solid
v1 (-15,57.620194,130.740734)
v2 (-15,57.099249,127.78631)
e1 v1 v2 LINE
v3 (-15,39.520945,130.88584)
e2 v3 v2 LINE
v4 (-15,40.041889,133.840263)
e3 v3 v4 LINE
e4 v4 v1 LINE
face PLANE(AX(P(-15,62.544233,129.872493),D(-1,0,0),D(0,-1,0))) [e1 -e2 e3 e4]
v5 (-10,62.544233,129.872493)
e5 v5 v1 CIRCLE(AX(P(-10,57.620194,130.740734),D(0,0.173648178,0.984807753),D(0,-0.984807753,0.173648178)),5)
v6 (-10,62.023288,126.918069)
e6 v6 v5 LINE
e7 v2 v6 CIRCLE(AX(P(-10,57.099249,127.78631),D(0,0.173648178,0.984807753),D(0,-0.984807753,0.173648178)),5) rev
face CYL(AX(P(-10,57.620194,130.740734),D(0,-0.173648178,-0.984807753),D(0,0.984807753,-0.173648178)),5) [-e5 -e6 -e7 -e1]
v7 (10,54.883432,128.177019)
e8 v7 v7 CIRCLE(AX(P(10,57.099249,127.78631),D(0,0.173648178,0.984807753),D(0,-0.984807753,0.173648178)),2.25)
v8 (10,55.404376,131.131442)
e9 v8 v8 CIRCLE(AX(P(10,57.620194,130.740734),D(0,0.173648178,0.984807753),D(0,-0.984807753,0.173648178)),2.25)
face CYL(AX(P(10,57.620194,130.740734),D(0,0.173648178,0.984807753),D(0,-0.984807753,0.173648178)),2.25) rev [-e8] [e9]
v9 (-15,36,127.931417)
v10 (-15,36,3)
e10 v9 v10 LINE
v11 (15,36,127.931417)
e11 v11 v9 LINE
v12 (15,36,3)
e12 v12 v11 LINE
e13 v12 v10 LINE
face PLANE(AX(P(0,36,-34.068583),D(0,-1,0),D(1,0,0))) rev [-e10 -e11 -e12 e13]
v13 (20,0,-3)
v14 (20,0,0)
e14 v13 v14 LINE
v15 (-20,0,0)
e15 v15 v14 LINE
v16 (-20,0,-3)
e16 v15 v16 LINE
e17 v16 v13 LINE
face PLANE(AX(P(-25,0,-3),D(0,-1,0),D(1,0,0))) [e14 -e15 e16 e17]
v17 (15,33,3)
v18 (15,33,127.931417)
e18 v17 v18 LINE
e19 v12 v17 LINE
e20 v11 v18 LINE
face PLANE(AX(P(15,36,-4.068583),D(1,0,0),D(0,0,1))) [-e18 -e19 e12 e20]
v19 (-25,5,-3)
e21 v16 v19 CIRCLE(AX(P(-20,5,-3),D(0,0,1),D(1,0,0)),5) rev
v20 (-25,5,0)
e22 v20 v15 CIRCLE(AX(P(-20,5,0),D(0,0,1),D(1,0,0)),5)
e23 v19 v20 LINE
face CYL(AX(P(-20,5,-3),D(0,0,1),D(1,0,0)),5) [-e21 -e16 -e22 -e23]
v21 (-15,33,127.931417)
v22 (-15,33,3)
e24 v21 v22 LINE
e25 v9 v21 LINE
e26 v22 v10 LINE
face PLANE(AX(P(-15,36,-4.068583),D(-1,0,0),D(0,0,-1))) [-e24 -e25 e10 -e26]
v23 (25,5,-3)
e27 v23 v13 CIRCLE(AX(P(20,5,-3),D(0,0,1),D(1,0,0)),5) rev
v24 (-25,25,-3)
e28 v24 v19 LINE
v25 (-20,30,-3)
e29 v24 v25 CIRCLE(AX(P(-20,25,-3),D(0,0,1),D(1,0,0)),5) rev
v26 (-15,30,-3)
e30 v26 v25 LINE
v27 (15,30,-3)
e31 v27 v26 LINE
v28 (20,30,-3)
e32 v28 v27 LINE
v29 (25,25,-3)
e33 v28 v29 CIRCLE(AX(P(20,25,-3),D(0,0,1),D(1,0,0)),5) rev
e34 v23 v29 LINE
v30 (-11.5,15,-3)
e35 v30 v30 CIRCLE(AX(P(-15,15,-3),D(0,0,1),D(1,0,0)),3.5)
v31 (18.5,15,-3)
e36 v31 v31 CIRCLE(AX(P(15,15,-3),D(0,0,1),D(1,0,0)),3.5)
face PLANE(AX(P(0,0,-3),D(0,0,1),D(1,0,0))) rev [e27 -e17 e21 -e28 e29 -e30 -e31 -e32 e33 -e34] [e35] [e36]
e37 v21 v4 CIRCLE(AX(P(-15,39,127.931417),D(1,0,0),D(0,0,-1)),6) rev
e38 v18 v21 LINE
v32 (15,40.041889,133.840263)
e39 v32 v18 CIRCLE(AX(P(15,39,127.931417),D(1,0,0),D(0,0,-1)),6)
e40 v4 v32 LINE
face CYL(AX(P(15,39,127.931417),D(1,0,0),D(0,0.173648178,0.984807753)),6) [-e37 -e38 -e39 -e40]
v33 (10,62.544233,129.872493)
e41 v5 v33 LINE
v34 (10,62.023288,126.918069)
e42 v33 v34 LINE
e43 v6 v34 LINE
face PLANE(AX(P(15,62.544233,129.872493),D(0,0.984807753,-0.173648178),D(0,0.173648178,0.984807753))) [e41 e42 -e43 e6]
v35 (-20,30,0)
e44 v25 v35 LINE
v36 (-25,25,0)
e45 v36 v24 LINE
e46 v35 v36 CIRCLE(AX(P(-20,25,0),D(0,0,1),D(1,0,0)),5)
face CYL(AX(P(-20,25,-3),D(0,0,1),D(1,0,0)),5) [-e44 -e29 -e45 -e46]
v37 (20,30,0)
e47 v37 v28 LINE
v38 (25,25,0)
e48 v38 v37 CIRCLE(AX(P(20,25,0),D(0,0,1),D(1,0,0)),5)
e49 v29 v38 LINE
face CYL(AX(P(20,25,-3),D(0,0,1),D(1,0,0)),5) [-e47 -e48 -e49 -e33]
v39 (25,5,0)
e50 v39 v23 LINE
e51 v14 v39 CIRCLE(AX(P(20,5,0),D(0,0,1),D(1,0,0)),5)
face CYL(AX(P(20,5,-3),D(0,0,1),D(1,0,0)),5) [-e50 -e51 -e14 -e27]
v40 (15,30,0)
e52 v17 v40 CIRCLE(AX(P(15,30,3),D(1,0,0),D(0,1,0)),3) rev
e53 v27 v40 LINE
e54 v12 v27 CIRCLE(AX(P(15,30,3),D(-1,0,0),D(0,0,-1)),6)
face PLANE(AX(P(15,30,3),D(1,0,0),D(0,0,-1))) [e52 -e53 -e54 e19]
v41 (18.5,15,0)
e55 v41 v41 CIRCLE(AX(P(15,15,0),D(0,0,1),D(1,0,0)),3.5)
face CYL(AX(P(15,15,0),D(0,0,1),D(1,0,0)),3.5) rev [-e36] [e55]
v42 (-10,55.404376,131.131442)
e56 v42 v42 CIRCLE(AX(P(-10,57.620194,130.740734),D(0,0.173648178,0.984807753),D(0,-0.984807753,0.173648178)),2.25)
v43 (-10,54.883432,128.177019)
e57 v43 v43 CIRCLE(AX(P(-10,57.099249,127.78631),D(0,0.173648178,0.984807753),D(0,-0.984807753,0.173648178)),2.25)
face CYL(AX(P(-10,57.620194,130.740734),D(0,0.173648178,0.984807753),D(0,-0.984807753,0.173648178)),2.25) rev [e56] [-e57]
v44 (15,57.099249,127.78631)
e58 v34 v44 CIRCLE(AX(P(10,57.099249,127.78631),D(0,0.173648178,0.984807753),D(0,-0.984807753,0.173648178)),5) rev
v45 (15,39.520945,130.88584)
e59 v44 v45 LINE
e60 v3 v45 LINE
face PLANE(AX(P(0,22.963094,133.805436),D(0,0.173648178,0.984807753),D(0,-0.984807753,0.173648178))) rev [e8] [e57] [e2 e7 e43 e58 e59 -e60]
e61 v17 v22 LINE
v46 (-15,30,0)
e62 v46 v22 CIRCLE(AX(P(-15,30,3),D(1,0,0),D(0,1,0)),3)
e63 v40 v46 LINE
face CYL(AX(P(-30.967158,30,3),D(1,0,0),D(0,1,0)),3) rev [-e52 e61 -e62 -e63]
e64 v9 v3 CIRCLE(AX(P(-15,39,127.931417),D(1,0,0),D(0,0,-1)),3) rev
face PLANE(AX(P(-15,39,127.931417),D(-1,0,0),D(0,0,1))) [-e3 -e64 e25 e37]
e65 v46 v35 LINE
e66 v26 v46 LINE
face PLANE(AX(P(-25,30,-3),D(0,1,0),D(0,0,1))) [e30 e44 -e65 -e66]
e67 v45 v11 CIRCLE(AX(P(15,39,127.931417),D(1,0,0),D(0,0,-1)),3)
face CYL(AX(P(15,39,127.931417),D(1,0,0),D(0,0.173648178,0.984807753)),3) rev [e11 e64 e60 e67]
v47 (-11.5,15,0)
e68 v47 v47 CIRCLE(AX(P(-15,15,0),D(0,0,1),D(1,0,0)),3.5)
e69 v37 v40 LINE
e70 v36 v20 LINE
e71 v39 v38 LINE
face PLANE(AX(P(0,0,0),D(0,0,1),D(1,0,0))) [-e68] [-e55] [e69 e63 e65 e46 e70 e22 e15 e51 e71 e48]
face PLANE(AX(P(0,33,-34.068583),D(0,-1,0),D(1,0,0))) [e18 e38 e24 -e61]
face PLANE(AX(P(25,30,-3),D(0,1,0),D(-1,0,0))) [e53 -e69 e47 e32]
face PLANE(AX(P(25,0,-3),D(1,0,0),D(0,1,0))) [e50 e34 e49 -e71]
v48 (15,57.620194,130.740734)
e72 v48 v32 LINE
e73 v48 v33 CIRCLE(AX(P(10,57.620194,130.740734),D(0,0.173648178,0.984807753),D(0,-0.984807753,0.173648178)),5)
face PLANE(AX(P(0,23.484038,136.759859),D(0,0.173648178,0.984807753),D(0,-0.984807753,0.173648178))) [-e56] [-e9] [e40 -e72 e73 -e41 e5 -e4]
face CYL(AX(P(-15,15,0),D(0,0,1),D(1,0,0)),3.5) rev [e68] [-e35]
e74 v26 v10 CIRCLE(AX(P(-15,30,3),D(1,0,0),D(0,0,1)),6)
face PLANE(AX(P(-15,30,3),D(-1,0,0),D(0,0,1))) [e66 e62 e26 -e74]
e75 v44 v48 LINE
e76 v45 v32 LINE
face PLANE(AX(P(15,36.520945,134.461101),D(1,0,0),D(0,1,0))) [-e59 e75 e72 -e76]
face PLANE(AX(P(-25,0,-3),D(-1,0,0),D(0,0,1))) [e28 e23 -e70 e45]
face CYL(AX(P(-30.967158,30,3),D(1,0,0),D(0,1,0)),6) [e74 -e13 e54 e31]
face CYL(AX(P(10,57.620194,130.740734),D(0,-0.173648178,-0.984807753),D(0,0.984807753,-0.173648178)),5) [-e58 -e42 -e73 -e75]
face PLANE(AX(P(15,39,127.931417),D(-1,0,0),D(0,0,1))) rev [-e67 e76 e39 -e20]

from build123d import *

# Parameters (mm, degrees)
SM_BASE_FLANGE_1_DEPTH = 3
HOLE_WIZARD_M61_D      = 7
OTHER_START            = -15
OTHER_1_DEPTH          = 30
OTHER_1_2_DEPTH        = 30
SM_EDGE_FLANGE_1_DEPTH = 30
HOLE_WIZARD_M41_D      = 4.5
HOLE_WIZARD_M41_DEPTH  = 3
FILLET_1_R             = 5
FILLET_2_R             = 5


# Read off the part's stored shape, not the designer's step: Нарисованный сгиб1
# Sheet-metal steps are written as plain solids
with BuildPart() as part:
    # Sketch 1 → Базовая кромка1 (new body)
    with BuildSketch(Plane.XY):
        Polygon((15, 30), (15, 162), (-15, 162), (-15, 30), (-25, 30), (-25, 0), (25, 0), (25, 30), align=None)
    extrude(amount=-SM_BASE_FLANGE_1_DEPTH)

    # Сверло под метчик  спиральное M61 (through all)
    with Locations(Plane.XY):
        with Locations((-15, 15), (15, 15)):
            Hole(HOLE_WIZARD_M61_D / 2)

    # Other 1 outline → Other 1 (cut)
    with BuildSketch(Plane.YZ.offset(OTHER_START)):
        with BuildLine():
            Line((162, 0), (35.196152423, 0))
            ThreePointArc((35.196152423, 0), (33, -2.196152423), (30, -3))
            Line((30, -3), (162, -3))
            Line((162, -3), (162, 0))
        make_face()
    extrude(amount=OTHER_1_DEPTH, mode=Mode.SUBTRACT)

    # Other 1 2 outline → Other 1 2 (add)
    with BuildSketch(Plane.YZ.offset(OTHER_START)):
        with BuildLine():
            Line((36, 3), (36, 127.931416529))
            Line((36, 127.931416529), (33, 127.931416529))
            Line((33, 127.931416529), (33, 3))
            ThreePointArc((33, 3), (32.121320344, 0.878679656), (30, 0))
            Line((30, 0), (35.196152423, 0))
            ThreePointArc((35.196152423, 0), (35.795554958, 1.447085729), (36, 3))
        make_face()
    extrude(amount=OTHER_1_2_DEPTH)

    # Ребро-кромка1 section (across the edge) → Ребро-кромка1 (add)
    with BuildSketch(Plane(origin=(-15, 36, 131.506677307), x_dir=(0, -0.17364817766692373, -0.9848077530122094), z_dir=(1, 0, 0))):
        with BuildLine():
            Line((-3, 3.575260778), (-3, 26.424739222))
            Line((-3, 26.424739222), (0, 26.424739222))
            Line((0, 26.424739222), (0, 3.575260778))
            ThreePointArc((0, 3.575260778), (1.071637171, 1.277127448), (3.520944533, 0.620837519))
            Line((3.520944533, 0.620837519), (4.041889066, -2.33358574))
            ThreePointArc((4.041889066, -2.33358574), (-0.856725658, -1.021005881), (-3, 3.575260778))
        make_face()
    extrude(amount=SM_EDGE_FLANGE_1_DEPTH)

    # Отверстие с зазором M41
    with Locations(Plane(origin=(0, 24.095443669, 136.652051617), x_dir=(1, 0, 0), z_dir=(0, 0.17364817766692325, 0.9848077530122094))):
        with Locations((-10, 34.041923465), (10, 34.041923465)):
            Hole(HOLE_WIZARD_M41_D / 2, depth=HOLE_WIZARD_M41_DEPTH)

    # Скругление1
    fillet_1_edges = [part.edges().sort_by_distance(p)[0] for p in [
        (-25, 0, -1.5),
        (25, 0, -1.5),
        (25, 30, -1.5),
        (-25, 30, -1.5),
    ]]
    fillet(fillet_1_edges, radius=FILLET_1_R)

    # Скругление2
    fillet_2_edges = [part.edges().sort_by_distance(p)[0] for p in [
        (-15, 62.283760324, 128.395281125),
        (15, 62.283760324, 128.395281125),
    ]]
    fillet(fillet_2_edges, radius=FILLET_2_R)


solid = part.part
